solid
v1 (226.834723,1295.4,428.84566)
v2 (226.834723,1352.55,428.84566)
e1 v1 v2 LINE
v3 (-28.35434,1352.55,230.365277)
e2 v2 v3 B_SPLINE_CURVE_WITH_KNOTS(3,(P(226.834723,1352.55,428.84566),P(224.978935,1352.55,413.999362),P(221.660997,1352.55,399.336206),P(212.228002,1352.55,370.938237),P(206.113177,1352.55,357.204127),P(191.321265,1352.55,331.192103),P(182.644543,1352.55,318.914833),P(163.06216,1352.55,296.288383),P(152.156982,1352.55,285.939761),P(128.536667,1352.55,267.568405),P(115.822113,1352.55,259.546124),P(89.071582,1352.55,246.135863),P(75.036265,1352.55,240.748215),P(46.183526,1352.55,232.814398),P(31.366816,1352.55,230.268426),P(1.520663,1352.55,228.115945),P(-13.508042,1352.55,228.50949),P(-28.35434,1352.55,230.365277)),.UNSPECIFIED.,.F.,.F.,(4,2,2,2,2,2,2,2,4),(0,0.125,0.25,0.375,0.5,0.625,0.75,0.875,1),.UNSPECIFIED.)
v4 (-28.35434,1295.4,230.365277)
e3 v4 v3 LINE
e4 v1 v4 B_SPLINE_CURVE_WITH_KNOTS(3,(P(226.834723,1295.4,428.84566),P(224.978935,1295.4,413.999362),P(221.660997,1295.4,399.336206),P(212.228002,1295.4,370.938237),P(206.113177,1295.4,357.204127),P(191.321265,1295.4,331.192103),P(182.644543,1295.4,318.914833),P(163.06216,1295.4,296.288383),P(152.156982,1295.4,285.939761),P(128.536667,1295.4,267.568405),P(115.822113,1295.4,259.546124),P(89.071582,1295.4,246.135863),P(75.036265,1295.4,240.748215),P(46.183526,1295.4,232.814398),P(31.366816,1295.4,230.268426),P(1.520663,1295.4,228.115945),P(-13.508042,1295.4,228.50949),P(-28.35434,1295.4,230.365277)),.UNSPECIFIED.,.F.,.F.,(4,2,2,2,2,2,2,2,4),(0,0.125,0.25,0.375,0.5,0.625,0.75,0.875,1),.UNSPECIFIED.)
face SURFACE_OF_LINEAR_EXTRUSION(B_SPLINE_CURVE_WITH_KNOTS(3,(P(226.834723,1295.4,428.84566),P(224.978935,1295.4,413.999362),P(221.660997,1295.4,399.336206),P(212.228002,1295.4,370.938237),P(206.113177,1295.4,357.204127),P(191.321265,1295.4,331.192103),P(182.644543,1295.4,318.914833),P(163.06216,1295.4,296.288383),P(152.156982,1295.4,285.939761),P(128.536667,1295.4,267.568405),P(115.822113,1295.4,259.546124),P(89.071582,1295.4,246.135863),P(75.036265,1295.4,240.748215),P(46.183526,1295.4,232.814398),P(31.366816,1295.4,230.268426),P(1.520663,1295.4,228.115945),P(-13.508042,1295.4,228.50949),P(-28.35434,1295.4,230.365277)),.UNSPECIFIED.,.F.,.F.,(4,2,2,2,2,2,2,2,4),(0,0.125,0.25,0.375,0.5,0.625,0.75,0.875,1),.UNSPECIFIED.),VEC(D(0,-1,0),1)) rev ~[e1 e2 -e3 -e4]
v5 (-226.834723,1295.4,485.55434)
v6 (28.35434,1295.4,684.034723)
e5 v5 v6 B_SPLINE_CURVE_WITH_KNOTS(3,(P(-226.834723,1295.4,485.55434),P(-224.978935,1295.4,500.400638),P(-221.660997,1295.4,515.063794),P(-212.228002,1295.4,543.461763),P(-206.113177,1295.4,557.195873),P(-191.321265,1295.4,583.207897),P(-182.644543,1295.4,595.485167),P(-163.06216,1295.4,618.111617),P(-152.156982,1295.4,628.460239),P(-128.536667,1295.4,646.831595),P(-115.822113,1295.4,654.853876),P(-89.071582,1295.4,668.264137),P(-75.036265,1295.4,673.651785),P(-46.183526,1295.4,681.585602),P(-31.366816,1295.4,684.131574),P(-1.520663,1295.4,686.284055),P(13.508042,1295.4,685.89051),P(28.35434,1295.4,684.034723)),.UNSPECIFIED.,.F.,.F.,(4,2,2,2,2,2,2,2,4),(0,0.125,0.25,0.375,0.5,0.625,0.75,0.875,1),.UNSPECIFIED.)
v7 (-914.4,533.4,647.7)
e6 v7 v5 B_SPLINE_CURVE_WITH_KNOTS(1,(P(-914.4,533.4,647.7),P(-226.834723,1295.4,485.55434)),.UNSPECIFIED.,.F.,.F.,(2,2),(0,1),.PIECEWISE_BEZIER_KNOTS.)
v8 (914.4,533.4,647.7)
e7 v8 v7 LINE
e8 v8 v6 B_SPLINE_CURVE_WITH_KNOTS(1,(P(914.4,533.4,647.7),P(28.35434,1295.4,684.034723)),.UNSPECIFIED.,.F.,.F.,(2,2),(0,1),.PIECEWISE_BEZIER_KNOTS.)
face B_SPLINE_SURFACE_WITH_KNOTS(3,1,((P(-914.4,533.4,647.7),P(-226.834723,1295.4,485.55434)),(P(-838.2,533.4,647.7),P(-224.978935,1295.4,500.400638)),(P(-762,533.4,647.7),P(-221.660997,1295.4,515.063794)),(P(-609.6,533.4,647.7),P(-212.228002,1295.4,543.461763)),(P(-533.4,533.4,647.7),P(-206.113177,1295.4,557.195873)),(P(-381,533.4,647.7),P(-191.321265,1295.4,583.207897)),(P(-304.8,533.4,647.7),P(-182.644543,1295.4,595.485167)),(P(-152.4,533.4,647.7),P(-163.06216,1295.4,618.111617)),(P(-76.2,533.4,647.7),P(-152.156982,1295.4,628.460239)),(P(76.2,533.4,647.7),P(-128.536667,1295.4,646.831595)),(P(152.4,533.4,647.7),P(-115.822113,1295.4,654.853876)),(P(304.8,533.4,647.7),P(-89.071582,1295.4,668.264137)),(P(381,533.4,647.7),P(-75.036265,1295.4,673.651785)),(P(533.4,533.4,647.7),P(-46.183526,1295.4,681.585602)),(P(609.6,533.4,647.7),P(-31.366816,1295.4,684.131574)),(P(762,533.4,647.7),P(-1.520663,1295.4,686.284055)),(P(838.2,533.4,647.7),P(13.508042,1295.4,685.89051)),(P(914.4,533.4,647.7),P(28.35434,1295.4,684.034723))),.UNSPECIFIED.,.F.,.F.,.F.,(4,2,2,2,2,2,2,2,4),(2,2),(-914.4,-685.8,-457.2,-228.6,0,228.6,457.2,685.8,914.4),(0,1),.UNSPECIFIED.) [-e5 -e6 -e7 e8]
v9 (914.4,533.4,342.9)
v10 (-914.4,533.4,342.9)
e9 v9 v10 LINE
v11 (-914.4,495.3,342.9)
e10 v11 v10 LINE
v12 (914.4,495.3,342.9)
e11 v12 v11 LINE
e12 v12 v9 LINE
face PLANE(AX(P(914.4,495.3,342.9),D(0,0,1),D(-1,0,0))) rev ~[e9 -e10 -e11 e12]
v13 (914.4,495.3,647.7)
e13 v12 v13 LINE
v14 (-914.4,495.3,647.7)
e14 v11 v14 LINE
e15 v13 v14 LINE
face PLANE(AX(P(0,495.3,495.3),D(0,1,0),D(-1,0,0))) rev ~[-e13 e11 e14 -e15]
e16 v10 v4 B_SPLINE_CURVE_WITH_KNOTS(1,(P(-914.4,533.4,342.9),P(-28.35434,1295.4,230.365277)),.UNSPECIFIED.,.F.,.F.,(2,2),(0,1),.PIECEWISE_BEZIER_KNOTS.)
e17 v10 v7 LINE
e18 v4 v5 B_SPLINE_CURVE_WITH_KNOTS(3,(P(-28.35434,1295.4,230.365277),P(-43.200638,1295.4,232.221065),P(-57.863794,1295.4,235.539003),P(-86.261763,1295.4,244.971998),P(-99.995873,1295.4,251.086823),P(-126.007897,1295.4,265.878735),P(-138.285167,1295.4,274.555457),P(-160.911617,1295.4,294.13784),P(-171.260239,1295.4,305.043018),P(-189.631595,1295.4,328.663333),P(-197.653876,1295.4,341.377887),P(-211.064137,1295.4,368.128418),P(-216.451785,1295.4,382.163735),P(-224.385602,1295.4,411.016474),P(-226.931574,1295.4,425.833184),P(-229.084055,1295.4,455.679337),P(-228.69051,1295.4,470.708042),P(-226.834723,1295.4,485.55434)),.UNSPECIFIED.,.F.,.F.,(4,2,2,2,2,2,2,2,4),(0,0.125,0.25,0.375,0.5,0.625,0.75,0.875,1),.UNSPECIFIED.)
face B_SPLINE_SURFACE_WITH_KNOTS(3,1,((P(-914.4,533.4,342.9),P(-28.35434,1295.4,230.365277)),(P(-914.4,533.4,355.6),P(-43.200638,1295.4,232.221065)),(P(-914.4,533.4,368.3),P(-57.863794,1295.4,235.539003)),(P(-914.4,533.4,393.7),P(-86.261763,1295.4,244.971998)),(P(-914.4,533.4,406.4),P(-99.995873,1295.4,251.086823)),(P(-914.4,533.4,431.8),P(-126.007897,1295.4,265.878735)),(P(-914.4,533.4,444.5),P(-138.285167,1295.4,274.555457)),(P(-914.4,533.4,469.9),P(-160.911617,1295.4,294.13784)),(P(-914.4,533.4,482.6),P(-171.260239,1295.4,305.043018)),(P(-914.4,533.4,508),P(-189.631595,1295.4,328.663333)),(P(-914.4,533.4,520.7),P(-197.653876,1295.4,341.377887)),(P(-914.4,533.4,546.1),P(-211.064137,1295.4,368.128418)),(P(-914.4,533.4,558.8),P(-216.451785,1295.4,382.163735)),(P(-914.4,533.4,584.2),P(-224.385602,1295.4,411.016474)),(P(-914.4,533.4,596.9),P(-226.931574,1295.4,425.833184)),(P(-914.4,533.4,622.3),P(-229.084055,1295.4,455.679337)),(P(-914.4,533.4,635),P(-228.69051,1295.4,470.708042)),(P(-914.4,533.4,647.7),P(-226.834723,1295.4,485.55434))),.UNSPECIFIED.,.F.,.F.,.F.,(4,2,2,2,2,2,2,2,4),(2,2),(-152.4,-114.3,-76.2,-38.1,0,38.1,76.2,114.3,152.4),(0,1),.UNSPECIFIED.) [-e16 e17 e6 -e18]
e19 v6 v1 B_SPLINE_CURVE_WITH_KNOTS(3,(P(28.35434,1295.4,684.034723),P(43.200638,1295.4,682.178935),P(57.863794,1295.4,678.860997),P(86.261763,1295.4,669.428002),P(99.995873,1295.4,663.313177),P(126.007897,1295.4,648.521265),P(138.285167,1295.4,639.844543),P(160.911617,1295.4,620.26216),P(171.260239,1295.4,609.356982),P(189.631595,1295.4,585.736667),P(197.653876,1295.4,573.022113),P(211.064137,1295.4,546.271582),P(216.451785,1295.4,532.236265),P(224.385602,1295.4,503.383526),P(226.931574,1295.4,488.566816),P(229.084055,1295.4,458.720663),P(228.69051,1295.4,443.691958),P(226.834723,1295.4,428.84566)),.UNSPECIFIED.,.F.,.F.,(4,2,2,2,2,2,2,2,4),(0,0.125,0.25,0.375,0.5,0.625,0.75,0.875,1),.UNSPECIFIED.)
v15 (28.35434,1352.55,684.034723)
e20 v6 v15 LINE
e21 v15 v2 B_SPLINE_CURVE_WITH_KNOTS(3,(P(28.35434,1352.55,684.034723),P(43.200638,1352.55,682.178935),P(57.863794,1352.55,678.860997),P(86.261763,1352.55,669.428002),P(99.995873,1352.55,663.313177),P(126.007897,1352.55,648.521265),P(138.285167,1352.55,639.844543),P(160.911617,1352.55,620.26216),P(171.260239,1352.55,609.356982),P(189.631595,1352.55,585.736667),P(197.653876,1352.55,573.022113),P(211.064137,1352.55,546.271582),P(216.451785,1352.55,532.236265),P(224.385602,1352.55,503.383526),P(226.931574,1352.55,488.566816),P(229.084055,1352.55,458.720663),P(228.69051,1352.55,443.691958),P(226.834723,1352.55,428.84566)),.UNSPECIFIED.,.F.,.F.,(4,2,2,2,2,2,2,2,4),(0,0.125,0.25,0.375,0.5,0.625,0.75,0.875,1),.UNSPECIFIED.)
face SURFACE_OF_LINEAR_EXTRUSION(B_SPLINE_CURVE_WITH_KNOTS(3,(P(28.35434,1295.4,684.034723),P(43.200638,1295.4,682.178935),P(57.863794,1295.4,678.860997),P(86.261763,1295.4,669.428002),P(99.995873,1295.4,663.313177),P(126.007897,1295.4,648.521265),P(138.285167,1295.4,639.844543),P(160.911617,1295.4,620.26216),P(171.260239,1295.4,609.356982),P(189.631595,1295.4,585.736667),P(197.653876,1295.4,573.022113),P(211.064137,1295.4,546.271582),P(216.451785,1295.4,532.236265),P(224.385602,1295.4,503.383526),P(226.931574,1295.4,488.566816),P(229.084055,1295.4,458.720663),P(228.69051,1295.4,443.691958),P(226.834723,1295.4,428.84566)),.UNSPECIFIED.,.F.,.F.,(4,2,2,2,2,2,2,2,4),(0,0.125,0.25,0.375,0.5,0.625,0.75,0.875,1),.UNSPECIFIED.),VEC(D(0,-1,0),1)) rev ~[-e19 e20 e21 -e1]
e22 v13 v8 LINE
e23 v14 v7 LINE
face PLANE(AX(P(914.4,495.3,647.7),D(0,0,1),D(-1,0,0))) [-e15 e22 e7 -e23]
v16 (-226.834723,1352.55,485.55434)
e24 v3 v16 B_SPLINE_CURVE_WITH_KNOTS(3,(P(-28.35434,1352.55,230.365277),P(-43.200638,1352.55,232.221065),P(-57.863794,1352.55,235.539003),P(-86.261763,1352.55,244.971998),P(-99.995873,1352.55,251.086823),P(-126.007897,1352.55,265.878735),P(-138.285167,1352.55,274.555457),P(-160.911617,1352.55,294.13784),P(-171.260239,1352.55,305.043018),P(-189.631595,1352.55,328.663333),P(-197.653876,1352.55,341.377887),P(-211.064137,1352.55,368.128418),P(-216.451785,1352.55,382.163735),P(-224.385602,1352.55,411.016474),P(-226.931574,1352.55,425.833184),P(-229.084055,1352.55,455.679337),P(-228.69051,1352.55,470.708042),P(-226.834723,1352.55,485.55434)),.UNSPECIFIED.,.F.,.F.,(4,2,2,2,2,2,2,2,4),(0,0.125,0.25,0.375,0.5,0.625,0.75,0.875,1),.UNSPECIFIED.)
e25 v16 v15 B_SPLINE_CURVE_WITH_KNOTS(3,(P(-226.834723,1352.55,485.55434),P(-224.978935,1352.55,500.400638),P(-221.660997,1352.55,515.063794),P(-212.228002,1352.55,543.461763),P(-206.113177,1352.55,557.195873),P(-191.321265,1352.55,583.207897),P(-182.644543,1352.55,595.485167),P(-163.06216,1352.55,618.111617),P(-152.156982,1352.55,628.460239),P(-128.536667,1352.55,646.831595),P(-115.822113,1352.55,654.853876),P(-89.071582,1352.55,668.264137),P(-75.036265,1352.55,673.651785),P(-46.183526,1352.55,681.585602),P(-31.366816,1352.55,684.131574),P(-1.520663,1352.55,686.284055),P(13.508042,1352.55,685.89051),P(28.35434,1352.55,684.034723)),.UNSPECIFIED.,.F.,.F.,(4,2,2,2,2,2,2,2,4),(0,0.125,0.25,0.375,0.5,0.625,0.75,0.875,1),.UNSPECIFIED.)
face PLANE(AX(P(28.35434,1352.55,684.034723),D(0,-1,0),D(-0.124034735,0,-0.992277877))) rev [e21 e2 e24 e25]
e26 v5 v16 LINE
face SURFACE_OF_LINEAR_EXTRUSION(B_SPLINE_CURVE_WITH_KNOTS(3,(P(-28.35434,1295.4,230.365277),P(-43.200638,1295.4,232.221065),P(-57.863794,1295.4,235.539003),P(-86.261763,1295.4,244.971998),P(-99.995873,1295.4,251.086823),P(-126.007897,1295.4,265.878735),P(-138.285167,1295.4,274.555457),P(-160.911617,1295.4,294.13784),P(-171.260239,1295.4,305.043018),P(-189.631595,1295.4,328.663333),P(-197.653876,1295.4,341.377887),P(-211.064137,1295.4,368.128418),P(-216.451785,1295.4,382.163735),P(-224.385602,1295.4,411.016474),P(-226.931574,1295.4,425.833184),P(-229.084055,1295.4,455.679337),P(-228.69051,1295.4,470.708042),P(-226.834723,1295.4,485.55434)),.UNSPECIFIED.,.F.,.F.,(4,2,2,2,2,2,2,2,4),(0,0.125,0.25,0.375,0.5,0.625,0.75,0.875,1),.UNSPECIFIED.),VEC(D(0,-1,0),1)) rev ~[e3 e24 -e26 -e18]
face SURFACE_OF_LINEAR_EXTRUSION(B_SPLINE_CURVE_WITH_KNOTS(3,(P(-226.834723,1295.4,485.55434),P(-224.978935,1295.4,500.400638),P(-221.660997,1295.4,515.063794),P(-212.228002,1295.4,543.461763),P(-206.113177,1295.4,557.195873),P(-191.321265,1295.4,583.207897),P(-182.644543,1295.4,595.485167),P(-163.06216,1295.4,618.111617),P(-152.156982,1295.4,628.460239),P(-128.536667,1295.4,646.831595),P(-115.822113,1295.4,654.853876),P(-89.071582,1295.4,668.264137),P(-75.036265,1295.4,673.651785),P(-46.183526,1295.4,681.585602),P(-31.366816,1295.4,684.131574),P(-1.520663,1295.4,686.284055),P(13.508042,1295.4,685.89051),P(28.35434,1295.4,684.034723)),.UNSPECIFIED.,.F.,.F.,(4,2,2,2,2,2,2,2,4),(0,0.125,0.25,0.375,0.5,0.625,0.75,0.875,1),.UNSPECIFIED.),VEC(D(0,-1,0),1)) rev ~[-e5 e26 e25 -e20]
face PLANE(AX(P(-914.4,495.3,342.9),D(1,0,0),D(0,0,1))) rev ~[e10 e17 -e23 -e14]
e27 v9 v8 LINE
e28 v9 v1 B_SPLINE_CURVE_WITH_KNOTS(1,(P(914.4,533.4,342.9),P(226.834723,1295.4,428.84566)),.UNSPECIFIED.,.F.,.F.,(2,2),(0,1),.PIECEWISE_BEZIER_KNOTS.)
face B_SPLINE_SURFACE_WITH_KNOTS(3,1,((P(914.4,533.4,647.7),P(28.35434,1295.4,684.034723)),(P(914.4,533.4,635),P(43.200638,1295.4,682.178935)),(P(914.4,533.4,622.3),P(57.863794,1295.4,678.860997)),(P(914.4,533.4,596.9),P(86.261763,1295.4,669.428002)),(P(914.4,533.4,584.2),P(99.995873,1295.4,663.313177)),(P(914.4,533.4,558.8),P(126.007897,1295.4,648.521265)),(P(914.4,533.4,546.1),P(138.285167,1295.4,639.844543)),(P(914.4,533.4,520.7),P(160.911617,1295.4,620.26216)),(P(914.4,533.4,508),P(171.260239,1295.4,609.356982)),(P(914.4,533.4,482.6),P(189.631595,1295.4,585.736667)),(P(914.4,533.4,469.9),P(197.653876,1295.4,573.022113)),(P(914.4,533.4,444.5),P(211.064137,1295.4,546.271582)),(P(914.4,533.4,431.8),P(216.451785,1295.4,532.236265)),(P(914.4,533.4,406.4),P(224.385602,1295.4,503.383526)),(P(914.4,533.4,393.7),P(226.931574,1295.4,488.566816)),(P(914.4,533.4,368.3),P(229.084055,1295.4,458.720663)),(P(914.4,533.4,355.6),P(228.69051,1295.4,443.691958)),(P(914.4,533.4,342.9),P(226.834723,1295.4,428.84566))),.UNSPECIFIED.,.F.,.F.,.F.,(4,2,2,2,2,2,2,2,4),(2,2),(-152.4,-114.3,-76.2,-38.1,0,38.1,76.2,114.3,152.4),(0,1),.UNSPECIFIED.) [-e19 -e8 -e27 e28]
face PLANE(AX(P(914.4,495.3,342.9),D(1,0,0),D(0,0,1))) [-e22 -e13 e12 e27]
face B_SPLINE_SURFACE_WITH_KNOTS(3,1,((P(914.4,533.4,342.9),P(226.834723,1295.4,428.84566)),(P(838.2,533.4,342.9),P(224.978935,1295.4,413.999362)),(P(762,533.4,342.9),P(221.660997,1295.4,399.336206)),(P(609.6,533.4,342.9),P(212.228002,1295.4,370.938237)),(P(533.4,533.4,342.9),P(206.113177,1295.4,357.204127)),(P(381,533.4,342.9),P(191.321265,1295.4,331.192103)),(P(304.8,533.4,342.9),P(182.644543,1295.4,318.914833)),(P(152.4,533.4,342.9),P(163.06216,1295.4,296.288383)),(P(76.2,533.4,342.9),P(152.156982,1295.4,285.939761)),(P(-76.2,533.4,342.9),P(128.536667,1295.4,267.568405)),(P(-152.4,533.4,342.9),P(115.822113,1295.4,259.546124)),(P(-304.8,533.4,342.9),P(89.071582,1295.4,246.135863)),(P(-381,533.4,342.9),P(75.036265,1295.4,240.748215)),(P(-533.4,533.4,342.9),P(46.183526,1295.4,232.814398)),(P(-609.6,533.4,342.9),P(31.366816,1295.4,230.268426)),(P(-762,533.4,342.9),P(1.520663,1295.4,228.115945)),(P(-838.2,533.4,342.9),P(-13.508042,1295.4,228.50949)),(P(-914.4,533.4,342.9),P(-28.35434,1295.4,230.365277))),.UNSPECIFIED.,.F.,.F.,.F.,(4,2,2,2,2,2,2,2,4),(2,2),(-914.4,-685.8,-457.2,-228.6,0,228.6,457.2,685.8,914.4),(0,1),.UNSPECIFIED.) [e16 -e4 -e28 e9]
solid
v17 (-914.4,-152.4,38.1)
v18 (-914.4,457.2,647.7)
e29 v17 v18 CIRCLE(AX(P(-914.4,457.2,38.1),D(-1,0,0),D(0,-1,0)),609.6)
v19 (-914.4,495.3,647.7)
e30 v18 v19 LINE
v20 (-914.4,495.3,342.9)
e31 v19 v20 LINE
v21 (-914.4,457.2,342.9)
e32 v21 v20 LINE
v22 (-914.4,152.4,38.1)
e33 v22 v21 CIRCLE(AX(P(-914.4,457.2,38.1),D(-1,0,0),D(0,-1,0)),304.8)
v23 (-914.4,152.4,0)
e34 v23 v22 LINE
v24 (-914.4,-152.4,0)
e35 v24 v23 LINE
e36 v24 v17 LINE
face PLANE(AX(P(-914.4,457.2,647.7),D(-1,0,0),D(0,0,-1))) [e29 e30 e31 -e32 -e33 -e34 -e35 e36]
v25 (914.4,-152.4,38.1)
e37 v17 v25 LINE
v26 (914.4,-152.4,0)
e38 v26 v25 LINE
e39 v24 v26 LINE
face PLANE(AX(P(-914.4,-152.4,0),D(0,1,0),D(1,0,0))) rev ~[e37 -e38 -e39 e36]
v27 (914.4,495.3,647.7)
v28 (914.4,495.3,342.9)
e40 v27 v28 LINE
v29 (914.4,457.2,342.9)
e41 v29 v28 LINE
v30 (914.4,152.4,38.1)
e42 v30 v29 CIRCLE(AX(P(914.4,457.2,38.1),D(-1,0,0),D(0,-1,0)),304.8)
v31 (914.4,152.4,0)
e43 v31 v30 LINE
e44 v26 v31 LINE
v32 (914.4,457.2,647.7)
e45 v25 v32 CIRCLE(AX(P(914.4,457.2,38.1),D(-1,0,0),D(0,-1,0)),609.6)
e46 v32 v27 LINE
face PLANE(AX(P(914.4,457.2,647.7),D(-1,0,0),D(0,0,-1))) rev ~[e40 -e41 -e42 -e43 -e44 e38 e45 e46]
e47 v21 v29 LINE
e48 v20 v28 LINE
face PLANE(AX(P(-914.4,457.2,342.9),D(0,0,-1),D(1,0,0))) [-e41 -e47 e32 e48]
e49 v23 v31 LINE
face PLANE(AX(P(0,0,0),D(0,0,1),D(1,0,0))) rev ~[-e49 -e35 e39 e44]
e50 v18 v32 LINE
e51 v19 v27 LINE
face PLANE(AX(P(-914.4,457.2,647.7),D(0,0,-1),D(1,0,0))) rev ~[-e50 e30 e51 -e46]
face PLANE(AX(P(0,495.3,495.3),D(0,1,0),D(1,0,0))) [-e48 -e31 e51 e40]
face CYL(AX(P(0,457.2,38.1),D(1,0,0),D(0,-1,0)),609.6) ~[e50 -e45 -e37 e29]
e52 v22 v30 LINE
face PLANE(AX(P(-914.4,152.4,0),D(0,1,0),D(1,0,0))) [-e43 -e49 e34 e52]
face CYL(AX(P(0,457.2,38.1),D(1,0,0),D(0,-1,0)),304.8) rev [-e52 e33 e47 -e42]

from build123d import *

# Parameters (mm, degrees)
F0_W      = 1828.8
F0_H      = 304.8
F1_DEPTH  = 38.1
F2_W      = 1828.8
F2_H      = 304.8
F3_ANGLE  = 90
F4_DEPTH  = 38.1
F5_W      = 1828.8
F5_H      = 304.8
F6_DEPTH  = 38.1
F6_FACE_W = 1828.8
F6_FACE_H = 304.8
F10_DEPTH = 57.15


# Not quite as in the source:
# - the arcs of a loft's sections are written as splines that run evenly, so that the points pair up as in the source's solid


with BuildPart() as f1:
    # F0 (on Top) → F1 (new body)
    with BuildSketch(Plane.XY):
        Rectangle(F0_W, F0_H)
    extrude(amount=F1_DEPTH)

    # F2 (on face) → F3 (revolve)
    with BuildSketch(Plane.XY.offset(38.1)):
        Rectangle(F2_W, F2_H)
    revolve(axis=Axis((-103.2055318356, 457.2, 38.1), (-1, 0, 0)), revolution_arc=F3_ANGLE)

    # F4 (add): a face of the model
    f4_faces = [f1.faces().sort_by_distance(p)[0] for p in [
        (0, 457.2, 495.3),
    ]]
    extrude(f4_faces, amount=F4_DEPTH)


with BuildPart() as f6:
    # F5 (on face) → F6 (new body)
    with BuildSketch(Plane(origin=(0, 495.3, 0), x_dir=(-1, 0, 0), z_dir=(0, 1, 0))):
        with Locations((0, 495.3)):
            Rectangle(F5_W, F5_H)
    extrude(amount=F6_DEPTH)

    # F6_face (on face) → F9 section 0
    with BuildSketch(Plane(origin=(0, 533.4, 495.3), x_dir=(-1, 0, 0), z_dir=(0, 1, 0))):
        Rectangle(F6_FACE_W, F6_FACE_H)
    # F8 (on offset) → F9 section 1
    with BuildSketch(Plane(origin=(0, 1295.4, 0), x_dir=(-1, 0, 0), z_dir=(0, 1, 0))):
        with BuildLine():
            add(Edge.make_bspline(
                [(-226.8347226167, 428.8456596729), (-224.978935382, 413.9993617947), (-221.6609974791, 399.3362055901), (-212.2280018047, 370.9382369937), (-206.1131772825, 357.2041267978), (-191.3212651368, 331.1921033689), (-182.6445432725, 318.9148333344), (-163.062159544, 296.2883825456), (-152.1569818928, 285.9397612748), (-128.5366666062, 267.5684049408), (-115.8221130296, 259.5461241455), (-89.0715816549, 246.1358631874), (-75.0362653164, 240.7482146197), (-46.1835257726, 232.8143978457), (-31.366816008, 230.2684258186), (-1.5206628948, 228.1159453578), (13.5080424489, 228.5094901485), (28.3543403271, 230.3652773833)],
                knots=[0, 0, 0, 0, 0.125, 0.125, 0.25, 0.25, 0.375, 0.375, 0.5, 0.5, 0.625, 0.625, 0.75, 0.75, 0.875, 0.875, 1, 1, 1, 1], degree=3))
            add(Edge.make_bspline(
                [(28.3543403271, 230.3652773833), (43.2006382053, 232.221064618), (57.8637944099, 235.5390025209), (86.2617630063, 244.9719981953), (99.9958732022, 251.0868227175), (126.0078966311, 265.8787348632), (138.2851666656, 274.5554567275), (160.9116174544, 294.137840456), (171.2602387252, 305.0430181072), (189.6315950592, 328.6633333938), (197.6538758545, 341.3778869704), (211.0641368126, 368.1284183451), (216.4517853803, 382.1637346836), (224.3856021543, 411.0164742274), (226.9315741814, 425.833183992), (229.0840546422, 455.6793371052), (228.6905098515, 470.7080424489), (226.8347226167, 485.5543403271)],
                knots=[0, 0, 0, 0, 0.125, 0.125, 0.25, 0.25, 0.375, 0.375, 0.5, 0.5, 0.625, 0.625, 0.75, 0.75, 0.875, 0.875, 1, 1, 1, 1], degree=3))
            add(Edge.make_bspline(
                [(226.8347226167, 485.5543403271), (224.978935382, 500.4006382053), (221.6609974791, 515.0637944099), (212.2280018047, 543.4617630063), (206.1131772825, 557.1958732022), (191.3212651368, 583.2078966311), (182.6445432725, 595.4851666656), (163.062159544, 618.1116174544), (152.1569818928, 628.4602387252), (128.5366666062, 646.8315950592), (115.8221130296, 654.8538758545), (89.0715816549, 668.2641368126), (75.0362653164, 673.6517853803), (46.1835257726, 681.5856021543), (31.366816008, 684.1315741814), (1.5206628948, 686.2840546422), (-13.5080424489, 685.8905098515), (-28.3543403271, 684.0347226167)],
                knots=[0, 0, 0, 0, 0.125, 0.125, 0.25, 0.25, 0.375, 0.375, 0.5, 0.5, 0.625, 0.625, 0.75, 0.75, 0.875, 0.875, 1, 1, 1, 1], degree=3))
            add(Edge.make_bspline(
                [(-28.3543403271, 684.0347226167), (-43.2006382053, 682.178935382), (-57.8637944099, 678.8609974791), (-86.2617630063, 669.4280018047), (-99.9958732022, 663.3131772825), (-126.0078966311, 648.5212651368), (-138.2851666656, 639.8445432725), (-160.9116174544, 620.262159544), (-171.2602387252, 609.3569818928), (-189.6315950592, 585.7366666062), (-197.6538758545, 573.0221130296), (-211.0641368126, 546.2715816549), (-216.4517853803, 532.2362653164), (-224.3856021543, 503.3835257726), (-226.9315741814, 488.566816008), (-229.0840546422, 458.7206628948), (-228.6905098515, 443.6919575511), (-226.8347226167, 428.8456596729)],
                knots=[0, 0, 0, 0, 0.125, 0.125, 0.25, 0.25, 0.375, 0.375, 0.5, 0.5, 0.625, 0.625, 0.75, 0.75, 0.875, 0.875, 1, 1, 1, 1], degree=3))
        make_face()
    loft(ruled=True)

    # F10 (add): a face of the model
    f10_faces = [f6.faces().sort_by_distance(p)[0] for p in [
        (0, 1295.4, 457.2),
    ]]
    extrude(f10_faces, amount=F10_DEPTH)


solid = Compound([f1.part, f6.part])
